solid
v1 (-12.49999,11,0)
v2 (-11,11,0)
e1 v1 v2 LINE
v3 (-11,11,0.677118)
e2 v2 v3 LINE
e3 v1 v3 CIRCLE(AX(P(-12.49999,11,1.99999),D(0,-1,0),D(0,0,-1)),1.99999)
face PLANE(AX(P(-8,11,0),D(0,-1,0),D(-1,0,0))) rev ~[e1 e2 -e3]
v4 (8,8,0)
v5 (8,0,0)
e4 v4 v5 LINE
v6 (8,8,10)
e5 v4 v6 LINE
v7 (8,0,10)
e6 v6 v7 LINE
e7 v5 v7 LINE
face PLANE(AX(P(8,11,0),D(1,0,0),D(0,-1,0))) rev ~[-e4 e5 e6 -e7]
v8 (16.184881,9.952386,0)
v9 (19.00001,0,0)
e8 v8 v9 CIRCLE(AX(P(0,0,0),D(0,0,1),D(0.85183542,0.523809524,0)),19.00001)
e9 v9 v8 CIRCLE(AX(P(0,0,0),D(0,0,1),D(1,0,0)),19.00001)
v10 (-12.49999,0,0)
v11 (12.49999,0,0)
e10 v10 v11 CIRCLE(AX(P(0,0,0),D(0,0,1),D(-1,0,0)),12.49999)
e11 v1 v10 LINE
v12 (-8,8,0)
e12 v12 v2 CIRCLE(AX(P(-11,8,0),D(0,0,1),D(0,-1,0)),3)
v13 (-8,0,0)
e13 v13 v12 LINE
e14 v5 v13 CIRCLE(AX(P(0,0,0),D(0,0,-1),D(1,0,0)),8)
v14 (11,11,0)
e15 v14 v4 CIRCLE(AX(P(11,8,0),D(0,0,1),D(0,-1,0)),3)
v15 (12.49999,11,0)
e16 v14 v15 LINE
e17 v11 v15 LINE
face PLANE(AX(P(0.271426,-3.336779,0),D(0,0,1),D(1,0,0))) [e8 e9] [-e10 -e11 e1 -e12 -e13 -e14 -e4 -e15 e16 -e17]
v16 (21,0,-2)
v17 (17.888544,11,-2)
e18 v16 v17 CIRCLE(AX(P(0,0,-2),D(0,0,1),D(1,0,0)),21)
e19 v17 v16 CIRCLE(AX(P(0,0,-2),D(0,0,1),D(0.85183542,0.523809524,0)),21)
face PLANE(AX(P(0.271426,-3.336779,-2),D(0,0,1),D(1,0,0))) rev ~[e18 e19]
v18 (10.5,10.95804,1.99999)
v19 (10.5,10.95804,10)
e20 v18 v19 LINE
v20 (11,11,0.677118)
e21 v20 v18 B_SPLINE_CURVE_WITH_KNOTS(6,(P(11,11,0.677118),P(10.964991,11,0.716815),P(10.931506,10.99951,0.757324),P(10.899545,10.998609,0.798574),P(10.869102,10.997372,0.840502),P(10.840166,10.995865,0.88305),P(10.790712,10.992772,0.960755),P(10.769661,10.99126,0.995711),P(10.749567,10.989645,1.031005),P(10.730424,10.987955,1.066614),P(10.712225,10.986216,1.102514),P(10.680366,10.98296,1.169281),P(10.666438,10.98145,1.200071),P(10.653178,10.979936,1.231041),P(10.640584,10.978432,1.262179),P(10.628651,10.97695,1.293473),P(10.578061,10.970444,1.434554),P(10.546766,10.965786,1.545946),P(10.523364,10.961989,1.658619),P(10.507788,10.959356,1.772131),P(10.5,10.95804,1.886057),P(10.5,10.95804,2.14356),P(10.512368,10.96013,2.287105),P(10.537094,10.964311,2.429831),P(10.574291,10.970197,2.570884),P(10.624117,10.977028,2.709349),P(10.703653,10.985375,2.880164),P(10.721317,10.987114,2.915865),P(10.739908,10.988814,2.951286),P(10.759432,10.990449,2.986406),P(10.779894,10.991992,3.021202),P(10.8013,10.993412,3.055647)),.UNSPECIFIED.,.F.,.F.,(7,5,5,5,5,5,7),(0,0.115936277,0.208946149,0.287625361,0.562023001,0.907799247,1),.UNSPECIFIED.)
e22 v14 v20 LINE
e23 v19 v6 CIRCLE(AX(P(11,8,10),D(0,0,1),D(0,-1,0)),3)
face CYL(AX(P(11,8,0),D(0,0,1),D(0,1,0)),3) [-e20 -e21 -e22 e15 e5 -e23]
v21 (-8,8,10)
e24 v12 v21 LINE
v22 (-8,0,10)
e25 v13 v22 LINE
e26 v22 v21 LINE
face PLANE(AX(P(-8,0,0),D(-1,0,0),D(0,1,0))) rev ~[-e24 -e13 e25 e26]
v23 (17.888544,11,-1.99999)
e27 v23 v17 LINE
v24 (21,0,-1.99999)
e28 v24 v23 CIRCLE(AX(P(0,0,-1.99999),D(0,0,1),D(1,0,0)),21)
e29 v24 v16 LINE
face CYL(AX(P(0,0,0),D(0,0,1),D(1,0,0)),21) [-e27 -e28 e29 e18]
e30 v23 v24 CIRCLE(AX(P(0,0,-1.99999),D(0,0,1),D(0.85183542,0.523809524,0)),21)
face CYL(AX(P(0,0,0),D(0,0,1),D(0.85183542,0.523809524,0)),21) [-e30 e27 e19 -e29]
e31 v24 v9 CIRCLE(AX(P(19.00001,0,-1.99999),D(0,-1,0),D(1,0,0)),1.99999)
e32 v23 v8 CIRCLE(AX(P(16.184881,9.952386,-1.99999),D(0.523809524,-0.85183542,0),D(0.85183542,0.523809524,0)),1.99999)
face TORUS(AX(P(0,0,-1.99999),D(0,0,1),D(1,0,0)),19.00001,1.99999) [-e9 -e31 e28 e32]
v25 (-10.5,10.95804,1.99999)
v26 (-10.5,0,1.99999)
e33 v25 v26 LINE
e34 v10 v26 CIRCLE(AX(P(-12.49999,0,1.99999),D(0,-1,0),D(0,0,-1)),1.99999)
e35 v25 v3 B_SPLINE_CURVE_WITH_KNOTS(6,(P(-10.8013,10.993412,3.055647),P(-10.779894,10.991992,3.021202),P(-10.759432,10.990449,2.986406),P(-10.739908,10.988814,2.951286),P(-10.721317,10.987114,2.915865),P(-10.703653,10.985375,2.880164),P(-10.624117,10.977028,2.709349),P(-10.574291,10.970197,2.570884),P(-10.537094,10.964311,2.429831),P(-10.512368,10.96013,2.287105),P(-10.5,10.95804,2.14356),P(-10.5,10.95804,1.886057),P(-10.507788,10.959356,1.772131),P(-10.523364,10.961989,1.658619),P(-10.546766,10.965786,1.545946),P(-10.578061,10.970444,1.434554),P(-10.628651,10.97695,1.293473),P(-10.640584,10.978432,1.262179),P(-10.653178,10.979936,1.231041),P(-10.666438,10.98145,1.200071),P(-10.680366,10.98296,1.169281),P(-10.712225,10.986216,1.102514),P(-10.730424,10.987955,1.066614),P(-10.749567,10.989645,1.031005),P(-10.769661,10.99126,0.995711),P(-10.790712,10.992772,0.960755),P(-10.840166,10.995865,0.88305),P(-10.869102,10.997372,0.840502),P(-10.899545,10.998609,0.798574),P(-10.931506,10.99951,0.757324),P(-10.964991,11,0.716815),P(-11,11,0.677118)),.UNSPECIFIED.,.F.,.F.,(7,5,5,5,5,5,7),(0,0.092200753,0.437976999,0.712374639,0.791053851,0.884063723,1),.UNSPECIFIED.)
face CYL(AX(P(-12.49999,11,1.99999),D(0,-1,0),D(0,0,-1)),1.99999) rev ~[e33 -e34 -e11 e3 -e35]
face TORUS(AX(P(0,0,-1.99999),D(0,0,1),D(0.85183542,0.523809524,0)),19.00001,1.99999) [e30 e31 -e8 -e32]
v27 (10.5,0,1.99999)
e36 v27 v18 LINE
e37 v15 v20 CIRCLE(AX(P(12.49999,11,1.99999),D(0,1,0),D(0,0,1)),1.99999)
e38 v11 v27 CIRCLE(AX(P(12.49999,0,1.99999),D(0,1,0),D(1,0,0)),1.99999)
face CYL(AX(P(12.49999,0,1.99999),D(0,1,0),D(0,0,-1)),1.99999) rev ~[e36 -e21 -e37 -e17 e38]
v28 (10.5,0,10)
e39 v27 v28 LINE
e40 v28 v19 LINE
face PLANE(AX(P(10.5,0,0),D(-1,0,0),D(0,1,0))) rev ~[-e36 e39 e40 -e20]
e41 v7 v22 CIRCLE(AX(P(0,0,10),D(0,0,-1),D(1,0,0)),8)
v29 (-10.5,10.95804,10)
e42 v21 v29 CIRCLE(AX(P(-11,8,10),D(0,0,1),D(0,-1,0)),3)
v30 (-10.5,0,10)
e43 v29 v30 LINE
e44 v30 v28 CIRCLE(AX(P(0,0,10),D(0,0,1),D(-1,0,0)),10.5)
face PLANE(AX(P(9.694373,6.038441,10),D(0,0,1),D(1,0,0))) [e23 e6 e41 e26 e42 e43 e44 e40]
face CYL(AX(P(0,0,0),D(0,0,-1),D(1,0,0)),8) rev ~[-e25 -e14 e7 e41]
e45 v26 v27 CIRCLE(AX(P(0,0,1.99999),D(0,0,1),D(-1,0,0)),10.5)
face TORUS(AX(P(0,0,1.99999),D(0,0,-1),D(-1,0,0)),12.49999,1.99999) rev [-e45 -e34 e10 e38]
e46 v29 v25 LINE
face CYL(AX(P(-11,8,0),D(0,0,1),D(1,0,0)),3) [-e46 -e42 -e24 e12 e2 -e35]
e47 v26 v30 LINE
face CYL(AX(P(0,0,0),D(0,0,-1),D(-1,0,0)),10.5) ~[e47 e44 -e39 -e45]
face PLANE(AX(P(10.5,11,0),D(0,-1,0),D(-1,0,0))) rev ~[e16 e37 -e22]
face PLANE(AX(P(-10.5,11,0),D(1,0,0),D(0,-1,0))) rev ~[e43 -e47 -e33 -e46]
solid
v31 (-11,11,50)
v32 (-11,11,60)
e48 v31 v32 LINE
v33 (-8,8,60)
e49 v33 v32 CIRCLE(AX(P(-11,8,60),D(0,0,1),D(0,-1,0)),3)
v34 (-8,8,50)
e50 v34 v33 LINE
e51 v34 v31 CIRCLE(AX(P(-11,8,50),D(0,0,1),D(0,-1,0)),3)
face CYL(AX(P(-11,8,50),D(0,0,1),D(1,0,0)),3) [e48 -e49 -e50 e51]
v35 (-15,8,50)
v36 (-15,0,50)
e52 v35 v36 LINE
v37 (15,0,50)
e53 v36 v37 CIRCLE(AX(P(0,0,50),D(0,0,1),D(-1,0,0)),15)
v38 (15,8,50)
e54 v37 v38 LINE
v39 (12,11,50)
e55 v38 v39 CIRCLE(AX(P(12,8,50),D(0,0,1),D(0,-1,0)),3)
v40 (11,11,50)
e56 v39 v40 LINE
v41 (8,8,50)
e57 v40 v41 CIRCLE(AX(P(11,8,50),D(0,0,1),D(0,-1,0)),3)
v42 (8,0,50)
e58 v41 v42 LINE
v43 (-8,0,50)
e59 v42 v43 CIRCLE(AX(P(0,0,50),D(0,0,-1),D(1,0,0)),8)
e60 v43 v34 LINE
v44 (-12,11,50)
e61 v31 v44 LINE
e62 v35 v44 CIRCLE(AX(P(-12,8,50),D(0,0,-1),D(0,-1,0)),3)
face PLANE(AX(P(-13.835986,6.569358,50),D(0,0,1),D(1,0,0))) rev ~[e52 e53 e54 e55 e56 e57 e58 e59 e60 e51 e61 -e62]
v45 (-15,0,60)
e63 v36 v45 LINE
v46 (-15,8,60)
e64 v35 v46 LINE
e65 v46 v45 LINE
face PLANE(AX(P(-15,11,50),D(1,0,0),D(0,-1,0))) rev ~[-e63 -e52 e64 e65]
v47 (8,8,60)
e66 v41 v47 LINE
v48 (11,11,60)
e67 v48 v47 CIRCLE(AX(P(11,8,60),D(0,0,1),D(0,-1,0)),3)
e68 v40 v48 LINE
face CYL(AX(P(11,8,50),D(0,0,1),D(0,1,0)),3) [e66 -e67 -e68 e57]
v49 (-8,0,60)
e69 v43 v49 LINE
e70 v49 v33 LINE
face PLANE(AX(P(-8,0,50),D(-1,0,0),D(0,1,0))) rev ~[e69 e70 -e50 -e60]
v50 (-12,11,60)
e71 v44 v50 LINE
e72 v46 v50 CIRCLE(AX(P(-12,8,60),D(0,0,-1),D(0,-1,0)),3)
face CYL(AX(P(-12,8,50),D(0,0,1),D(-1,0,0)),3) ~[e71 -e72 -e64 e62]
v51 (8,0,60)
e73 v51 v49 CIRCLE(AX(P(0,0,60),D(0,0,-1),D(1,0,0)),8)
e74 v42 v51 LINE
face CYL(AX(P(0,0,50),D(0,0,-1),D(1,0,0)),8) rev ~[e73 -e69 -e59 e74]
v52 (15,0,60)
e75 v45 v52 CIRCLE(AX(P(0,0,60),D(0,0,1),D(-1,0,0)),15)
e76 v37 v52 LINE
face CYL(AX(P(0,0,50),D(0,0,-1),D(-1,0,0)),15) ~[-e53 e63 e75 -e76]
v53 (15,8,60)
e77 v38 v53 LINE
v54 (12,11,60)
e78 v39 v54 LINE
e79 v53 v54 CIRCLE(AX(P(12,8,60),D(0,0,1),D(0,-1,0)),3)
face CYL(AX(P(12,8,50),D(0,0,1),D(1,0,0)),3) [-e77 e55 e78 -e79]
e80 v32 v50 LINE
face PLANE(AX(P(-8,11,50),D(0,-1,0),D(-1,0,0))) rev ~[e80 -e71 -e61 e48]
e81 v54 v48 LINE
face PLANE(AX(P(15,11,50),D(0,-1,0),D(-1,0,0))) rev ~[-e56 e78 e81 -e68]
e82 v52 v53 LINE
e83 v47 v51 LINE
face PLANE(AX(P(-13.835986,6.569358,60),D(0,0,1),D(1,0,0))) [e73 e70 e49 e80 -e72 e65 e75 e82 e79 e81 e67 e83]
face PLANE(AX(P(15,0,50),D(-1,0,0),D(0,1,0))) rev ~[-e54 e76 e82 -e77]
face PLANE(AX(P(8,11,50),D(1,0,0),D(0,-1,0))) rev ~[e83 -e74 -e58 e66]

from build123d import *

# Parameters (mm, degrees)
F1_DEPTH = 2
F2_DEPTH = 10
F3_R     = 1.99999
F4_R     = 3
F7_DEPTH = 10
F8_R     = 3


# Not quite as in the source:
# - a fillet or chamfer is up to 0.001 mm smaller than in the source, because OpenCascade refuses the exact size


with BuildPart() as f1:
    # F0 (on Top) → F1 (new body)
    with BuildSketch(Plane.XY):
        with BuildLine():
            ThreePointArc((-17.88854382, 11), (-5.7157930237, -20.2071697699), (21, 0))
            ThreePointArc((21, 0), (20.2071697699, 5.7157930237), (17.88854382, 11))
            Line((17.88854382, 11), (10.5, 11))
            Line((10.5, 11), (10.5, 0))
            ThreePointArc((10.5, 0), (0, -10.5), (-10.5, 0))
            Line((-10.5, 0), (-10.5, 11))
            Line((-10.5, 11), (-17.88854382, 11))
        make_face()
        with BuildLine():
            Line((10.5, 11), (17.88854382, 11))
            ThreePointArc((17.88854382, 11), (0, 21), (-17.88854382, 11))
            Line((-17.88854382, 11), (-10.5, 11))
            Line((-10.5, 11), (-8, 11))
            Line((-8, 11), (8, 11))
            Line((8, 11), (10.5, 11))
        make_face()
        with BuildLine():
            ThreePointArc((-8, 0), (0, -8), (8, 0))
            ThreePointArc((8, 0), (0, 8), (-8, 0))
        make_face()
        with BuildLine():
            Line((8, 0), (8, 6.8007352544))
            ThreePointArc((8, 6.8007352544), (0, 10.5), (-8, 6.8007352544))
            Line((-8, 6.8007352544), (-8, 0))
            ThreePointArc((-8, 0), (0, 8), (8, 0))
        make_face()
        with BuildLine():
            ThreePointArc((-10.5, 0), (0, -10.5), (10.5, 0))
            ThreePointArc((10.5, 0), (9.8552016722, 3.6228441865), (8, 6.8007352544))
            Line((8, 6.8007352544), (8, 0))
            ThreePointArc((8, 0), (0, -8), (-8, 0))
            Line((-8, 0), (-8, 6.8007352544))
            ThreePointArc((-8, 6.8007352544), (-9.8552016722, 3.6228441865), (-10.5, 0))
        make_face()
        with BuildLine():
            Line((-8, 11), (-10.5, 11))
            Line((-10.5, 11), (-10.5, 0))
            ThreePointArc((-10.5, 0), (-9.8552016722, 3.6228441865), (-8, 6.8007352544))
            Line((-8, 6.8007352544), (-8, 11))
        make_face()
        with BuildLine():
            Line((8, 6.8007352544), (8, 11))
            Line((8, 11), (-8, 11))
            Line((-8, 11), (-8, 6.8007352544))
            ThreePointArc((-8, 6.8007352544), (0, 10.5), (8, 6.8007352544))
        make_face()
        with BuildLine():
            Line((10.5, 0), (10.5, 11))
            Line((10.5, 11), (8, 11))
            Line((8, 11), (8, 6.8007352544))
            ThreePointArc((8, 6.8007352544), (9.8552016722, 3.6228441865), (10.5, 0))
        make_face()
    extrude(amount=-F1_DEPTH)

    # F0 (on Top) → F2 (join)
    with BuildSketch(Plane.XY):
        with BuildLine():
            Line((10.5, 0), (10.5, 11))
            Line((10.5, 11), (8, 11))
            Line((8, 11), (8, 6.8007352544))
            ThreePointArc((8, 6.8007352544), (9.8552016722, 3.6228441865), (10.5, 0))
        make_face()
        with BuildLine():
            ThreePointArc((-10.5, 0), (0, -10.5), (10.5, 0))
            ThreePointArc((10.5, 0), (9.8552016722, 3.6228441865), (8, 6.8007352544))
            Line((8, 6.8007352544), (8, 0))
            ThreePointArc((8, 0), (0, -8), (-8, 0))
            Line((-8, 0), (-8, 6.8007352544))
            ThreePointArc((-8, 6.8007352544), (-9.8552016722, 3.6228441865), (-10.5, 0))
        make_face()
        with BuildLine():
            Line((-8, 11), (-10.5, 11))
            Line((-10.5, 11), (-10.5, 0))
            ThreePointArc((-10.5, 0), (-9.8552016722, 3.6228441865), (-8, 6.8007352544))
            Line((-8, 6.8007352544), (-8, 11))
        make_face()
    extrude(amount=F2_DEPTH)

    # F3 (radius 2 in the source; OpenCascade refuses exactly that, so slightly less here)
    f3_edges = [f1.edges().sort_by_distance(p)[0] for p in [
        (-21, 0, 0),
        (0, -10.5, 0),
        (10.5, 5.5, 0),
        (-10.5, 5.5, 0),
    ]]
    fillet(f3_edges, radius=F3_R)

    # F4
    f4_edges = [f1.edges().sort_by_distance(p)[0] for p in [
        (-8, 11, 5),
        (8, 11, 5),
    ]]
    fillet(f4_edges, radius=F4_R)


with BuildPart() as f7:
    # F6 (on offset) → F7 (new body)
    with BuildSketch(Plane.XY.offset(50)):
        with BuildLine():
            Line((-15, 11), (-15, 0))
            ThreePointArc((-15, 0), (-13.7471921753, 6.0012254829), (-10.1980390272, 11))
            Line((-10.1980390272, 11), (-15, 11))
        make_face()
        with BuildLine():
            ThreePointArc((-10.1980390272, 11), (-13.7471921753, 6.0012254829), (-15, 0))
            ThreePointArc((-15, 0), (0, -15), (15, 0))
            ThreePointArc((15, 0), (13.7471921753, 6.0012254829), (10.1980390272, 11))
            Line((10.1980390272, 11), (8, 11))
            Line((8, 11), (8, 0))
            ThreePointArc((8, 0), (0, -8), (-8, 0))
            Line((-8, 0), (-8, 11))
            Line((-8, 11), (-10.1980390272, 11))
        make_face()
        with BuildLine():
            ThreePointArc((10.1980390272, 11), (13.7471921753, 6.0012254829), (15, 0))
            Line((15, 0), (15, 11))
            Line((15, 11), (10.1980390272, 11))
        make_face()
    extrude(amount=F7_DEPTH)

    # F8
    f8_edges = [f7.edges().sort_by_distance(p)[0] for p in [
        (-8, 11, 55),
        (8, 11, 55),
        (-15, 11, 55),
        (15, 11, 55),
    ]]
    fillet(f8_edges, radius=F8_R)


solid = Compound([f1.part, f7.part])
